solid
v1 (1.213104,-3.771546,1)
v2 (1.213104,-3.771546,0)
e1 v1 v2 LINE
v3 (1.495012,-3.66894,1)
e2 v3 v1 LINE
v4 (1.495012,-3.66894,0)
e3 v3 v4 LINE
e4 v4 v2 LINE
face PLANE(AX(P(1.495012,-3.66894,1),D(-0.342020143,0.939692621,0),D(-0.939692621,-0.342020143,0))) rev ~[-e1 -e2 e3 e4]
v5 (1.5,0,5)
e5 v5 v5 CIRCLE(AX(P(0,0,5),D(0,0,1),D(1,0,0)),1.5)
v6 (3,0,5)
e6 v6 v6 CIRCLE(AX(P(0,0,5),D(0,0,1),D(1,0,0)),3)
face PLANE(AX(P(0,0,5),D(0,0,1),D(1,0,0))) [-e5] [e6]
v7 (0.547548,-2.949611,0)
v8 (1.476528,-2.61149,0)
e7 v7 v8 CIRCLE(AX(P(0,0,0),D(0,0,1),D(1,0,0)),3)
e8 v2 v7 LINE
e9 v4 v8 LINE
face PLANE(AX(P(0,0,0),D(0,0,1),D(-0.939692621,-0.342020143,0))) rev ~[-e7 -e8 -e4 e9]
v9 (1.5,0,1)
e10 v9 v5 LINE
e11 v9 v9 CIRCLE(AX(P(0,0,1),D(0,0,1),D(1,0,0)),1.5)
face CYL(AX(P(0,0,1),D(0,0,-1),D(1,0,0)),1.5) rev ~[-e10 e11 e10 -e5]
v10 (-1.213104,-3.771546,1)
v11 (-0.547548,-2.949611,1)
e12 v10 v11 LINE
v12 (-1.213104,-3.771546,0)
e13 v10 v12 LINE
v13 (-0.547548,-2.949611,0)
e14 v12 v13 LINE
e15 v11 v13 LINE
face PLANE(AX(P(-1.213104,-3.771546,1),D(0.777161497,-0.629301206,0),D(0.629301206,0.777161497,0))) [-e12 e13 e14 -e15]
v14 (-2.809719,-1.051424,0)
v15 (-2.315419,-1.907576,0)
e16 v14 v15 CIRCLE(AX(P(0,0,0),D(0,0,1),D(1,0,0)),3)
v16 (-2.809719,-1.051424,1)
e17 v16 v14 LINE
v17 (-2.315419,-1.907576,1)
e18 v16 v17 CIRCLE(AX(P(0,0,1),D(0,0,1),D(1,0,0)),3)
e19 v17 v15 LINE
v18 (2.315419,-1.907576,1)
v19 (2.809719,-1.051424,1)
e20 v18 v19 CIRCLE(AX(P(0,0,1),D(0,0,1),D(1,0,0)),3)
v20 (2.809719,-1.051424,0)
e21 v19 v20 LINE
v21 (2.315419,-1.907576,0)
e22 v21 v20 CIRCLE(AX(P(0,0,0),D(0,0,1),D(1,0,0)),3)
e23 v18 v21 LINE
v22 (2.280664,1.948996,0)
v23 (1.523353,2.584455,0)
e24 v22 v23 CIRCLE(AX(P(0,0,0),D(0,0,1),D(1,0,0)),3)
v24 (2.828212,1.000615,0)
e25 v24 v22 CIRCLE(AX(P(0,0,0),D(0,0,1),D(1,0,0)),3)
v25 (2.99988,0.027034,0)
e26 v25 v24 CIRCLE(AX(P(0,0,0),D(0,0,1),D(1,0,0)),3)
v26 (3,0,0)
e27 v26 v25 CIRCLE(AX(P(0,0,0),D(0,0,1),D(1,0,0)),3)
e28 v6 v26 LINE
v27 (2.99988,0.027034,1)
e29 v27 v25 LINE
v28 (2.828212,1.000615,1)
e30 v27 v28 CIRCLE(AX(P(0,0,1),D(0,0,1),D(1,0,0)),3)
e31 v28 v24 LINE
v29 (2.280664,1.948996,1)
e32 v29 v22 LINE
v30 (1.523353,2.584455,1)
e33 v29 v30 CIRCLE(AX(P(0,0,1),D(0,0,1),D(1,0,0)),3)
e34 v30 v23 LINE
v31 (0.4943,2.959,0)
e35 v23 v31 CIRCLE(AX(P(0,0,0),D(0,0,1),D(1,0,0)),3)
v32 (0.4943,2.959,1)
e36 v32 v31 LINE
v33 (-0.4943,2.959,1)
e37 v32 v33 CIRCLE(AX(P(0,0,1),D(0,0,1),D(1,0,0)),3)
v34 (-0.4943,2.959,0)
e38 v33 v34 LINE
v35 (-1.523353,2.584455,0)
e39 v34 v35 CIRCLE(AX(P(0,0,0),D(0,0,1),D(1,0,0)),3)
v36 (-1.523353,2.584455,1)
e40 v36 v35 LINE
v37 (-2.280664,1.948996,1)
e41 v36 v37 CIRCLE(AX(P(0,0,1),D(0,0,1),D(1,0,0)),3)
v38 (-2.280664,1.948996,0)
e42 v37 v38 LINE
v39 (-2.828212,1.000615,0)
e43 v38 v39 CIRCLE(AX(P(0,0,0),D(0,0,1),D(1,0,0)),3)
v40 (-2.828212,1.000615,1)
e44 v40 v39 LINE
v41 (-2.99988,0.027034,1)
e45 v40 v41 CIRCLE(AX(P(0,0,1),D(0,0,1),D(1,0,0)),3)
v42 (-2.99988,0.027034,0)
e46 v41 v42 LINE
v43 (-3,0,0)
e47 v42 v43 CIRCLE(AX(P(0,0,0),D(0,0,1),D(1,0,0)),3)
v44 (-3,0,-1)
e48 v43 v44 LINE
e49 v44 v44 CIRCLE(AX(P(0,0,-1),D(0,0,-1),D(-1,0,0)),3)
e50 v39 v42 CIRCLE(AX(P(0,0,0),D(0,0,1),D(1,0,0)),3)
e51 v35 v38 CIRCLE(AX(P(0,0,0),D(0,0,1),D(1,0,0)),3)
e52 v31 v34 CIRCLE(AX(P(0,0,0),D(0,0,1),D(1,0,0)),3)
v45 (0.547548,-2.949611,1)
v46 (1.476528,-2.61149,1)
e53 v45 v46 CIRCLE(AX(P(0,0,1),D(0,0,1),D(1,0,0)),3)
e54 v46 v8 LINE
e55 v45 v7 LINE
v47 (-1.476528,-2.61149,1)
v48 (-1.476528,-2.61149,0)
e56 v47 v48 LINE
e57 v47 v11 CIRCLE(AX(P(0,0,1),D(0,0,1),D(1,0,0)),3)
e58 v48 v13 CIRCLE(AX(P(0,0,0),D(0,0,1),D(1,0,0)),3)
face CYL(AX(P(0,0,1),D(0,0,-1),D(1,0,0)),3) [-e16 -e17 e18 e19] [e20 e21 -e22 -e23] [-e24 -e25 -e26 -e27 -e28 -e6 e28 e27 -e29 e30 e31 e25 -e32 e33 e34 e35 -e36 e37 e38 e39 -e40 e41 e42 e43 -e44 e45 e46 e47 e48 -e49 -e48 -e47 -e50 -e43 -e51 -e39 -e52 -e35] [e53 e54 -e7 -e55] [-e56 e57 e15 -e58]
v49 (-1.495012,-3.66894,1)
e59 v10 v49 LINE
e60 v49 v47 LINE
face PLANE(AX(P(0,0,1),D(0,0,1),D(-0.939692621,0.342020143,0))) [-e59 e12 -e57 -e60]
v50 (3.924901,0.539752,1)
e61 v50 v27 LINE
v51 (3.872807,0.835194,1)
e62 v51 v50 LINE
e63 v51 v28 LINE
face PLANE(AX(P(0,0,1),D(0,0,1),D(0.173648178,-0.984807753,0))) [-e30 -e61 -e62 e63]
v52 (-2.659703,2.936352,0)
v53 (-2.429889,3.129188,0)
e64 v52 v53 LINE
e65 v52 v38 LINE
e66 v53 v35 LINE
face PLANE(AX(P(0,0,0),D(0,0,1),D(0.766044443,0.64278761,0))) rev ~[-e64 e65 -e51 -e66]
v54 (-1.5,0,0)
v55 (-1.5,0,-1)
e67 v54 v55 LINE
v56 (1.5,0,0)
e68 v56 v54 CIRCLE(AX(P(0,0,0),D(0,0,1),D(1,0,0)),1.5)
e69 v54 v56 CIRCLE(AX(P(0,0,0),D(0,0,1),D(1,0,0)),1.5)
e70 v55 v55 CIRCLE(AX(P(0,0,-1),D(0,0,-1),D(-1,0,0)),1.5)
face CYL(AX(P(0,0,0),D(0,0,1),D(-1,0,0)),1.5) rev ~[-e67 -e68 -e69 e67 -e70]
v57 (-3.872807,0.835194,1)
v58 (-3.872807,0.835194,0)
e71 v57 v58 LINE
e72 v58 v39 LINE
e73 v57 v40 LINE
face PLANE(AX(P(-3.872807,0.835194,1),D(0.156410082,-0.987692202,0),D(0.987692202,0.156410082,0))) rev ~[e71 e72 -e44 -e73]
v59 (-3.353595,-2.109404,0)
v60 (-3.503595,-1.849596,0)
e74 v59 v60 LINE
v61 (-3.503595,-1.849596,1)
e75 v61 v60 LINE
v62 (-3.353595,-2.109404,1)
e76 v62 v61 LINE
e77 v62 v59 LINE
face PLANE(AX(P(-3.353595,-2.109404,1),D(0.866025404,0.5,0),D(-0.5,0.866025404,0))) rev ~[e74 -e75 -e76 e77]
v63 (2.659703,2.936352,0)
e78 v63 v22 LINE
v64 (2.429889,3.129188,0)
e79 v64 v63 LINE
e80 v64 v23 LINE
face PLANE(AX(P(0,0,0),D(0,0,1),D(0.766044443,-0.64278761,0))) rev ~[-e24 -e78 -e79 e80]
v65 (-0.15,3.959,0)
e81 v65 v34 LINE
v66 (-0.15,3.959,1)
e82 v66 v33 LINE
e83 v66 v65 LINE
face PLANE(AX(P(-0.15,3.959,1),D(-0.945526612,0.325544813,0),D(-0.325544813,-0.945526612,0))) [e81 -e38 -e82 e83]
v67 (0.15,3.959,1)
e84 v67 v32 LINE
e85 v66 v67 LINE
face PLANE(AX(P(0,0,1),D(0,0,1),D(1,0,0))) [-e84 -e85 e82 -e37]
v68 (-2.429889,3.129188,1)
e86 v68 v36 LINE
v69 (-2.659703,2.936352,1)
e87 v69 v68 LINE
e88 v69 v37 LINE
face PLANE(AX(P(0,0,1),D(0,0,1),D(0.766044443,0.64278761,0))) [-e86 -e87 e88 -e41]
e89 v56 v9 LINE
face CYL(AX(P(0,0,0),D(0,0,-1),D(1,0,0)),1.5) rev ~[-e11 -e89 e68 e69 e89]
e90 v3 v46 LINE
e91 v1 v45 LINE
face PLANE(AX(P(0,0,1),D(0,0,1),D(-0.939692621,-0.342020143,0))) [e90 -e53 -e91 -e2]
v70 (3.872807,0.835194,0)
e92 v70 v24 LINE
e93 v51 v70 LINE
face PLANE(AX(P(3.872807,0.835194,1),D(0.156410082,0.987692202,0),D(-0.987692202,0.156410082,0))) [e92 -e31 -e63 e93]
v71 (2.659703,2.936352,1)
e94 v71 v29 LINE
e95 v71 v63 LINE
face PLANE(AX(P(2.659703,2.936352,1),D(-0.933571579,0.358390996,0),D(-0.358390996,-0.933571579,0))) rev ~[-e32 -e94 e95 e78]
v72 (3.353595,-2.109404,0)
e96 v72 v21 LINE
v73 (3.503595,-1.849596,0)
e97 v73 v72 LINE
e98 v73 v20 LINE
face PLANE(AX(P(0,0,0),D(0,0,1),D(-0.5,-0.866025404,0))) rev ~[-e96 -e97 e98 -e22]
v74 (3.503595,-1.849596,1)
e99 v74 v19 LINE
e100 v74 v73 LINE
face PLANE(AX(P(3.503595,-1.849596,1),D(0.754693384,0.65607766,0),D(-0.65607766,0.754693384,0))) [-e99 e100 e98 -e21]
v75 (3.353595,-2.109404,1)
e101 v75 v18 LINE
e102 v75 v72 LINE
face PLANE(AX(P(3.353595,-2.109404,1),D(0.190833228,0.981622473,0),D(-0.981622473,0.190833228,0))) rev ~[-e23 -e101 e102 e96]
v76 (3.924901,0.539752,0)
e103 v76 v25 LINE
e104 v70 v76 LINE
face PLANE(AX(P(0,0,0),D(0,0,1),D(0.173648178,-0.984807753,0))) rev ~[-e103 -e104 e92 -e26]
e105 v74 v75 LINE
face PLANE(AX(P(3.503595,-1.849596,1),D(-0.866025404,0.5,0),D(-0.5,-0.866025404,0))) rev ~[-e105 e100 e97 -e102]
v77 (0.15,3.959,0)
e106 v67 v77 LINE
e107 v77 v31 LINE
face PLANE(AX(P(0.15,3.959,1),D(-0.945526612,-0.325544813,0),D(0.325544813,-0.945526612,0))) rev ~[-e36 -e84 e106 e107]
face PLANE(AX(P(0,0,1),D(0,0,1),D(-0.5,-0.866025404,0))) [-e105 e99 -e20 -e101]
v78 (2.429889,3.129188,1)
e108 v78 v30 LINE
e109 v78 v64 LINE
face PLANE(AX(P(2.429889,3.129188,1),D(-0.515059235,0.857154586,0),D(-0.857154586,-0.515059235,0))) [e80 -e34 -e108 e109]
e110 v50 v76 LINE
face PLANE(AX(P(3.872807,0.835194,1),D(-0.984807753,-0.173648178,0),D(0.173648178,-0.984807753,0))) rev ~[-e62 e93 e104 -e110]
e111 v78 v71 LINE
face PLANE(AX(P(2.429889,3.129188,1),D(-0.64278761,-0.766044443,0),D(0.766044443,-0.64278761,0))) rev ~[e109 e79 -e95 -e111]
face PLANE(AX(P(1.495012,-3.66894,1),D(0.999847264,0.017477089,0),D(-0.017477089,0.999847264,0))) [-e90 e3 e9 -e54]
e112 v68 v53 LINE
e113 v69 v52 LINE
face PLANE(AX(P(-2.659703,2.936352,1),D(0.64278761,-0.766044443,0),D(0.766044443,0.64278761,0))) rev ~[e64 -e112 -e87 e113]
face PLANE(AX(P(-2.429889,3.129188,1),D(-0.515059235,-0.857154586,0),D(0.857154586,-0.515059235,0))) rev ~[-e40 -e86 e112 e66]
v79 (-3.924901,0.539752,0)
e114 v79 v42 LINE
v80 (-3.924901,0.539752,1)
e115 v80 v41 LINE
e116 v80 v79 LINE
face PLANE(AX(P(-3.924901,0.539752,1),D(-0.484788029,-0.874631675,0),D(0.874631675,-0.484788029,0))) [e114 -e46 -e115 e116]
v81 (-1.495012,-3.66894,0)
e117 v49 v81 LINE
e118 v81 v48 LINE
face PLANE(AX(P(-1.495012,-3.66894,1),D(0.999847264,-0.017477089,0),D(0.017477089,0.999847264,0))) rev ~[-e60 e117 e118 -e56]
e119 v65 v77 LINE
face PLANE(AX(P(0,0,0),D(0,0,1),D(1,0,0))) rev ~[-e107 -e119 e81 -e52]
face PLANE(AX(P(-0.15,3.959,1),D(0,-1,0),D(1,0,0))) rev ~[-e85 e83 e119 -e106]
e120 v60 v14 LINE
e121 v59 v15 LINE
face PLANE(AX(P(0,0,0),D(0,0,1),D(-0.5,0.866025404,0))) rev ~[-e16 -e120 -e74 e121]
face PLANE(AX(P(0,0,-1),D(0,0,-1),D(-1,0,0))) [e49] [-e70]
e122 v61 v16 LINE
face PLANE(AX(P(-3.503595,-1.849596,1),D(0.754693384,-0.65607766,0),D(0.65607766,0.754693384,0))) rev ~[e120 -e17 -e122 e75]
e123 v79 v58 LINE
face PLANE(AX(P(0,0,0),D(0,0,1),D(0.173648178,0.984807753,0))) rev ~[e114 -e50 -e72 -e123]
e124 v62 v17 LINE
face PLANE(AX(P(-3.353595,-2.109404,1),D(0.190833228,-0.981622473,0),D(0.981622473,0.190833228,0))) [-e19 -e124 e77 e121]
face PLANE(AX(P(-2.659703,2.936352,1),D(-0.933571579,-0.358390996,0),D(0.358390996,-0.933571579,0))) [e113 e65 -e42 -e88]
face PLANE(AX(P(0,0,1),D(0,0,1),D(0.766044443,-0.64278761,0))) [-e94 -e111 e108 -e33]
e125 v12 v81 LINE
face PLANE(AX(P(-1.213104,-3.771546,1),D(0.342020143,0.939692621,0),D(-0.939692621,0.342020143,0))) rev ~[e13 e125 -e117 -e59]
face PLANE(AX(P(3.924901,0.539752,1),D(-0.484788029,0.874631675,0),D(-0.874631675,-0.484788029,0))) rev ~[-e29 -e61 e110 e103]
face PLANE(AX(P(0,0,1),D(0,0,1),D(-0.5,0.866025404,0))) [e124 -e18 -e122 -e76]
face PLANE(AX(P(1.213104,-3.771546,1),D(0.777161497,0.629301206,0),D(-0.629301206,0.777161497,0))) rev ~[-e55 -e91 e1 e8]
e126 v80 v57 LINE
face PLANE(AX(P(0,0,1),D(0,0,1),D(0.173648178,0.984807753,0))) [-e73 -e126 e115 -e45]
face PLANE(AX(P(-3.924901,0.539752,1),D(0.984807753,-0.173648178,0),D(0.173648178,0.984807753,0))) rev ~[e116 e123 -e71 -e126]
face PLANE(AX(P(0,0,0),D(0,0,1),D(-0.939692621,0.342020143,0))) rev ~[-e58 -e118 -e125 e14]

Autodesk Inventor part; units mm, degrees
ref_plane "YZ Plane" through (0, 0, 0) normal (1, 0, 0) x (0, 1, 0)
ref_plane "XZ Plane" through (0, 0, 0) normal (0, 1, 0) x (-1, 0, 0)
ref_plane "XY Plane" through (0, 0, 0) normal (0, 0, 1) x (1, 0, 0)
sketch "Sketch1" plane through (0, 0, 0) normal (0, 0, 1) x (1, 0, 0)
  circle A0 centre (0, 0) radius 3
  circle A1 centre (0, 0) radius 1.5
  dimension "d0" = 6
  dimension "d1" = 3
extrude "Extrusion1" add sketch "Sketch1" along normal blind 1
sketch "Sketch3" plane through (0, 0, 0) normal (0, 0, -1) x (-1, 0, 0)
  circle A0 centre (0, 0) radius 1.5 projected
  circle A1 centre (0, 0) radius 3 projected
extrude "Extrusion3" add sketch "Sketch3" along normal blind 1
sketch "Sketch2" plane through (0, 0, 1) normal (0, 0, 1) x (1, 0, 0)
  line L0 (0, 0) -> (0, 3.959) construction
  line L1 (-0.15, 3.959) -> (0.15, 3.959)
  line L2 (-0.4943, 2.959) -> (0.4943, 2.959)
  line L3 (-0.15, 3.959) -> (-0.4943, 2.959)
  line L4 (0.15, 3.959) -> (0.4943, 2.959)
  circle A0 centre (0, 0) radius 3 projected
  point P0 (0, 2.959)
  dimension "d4" = 1
  dimension "d5" = 0.3
  dimension "d8" = 109
extrude "Extrusion2" add sketch "Sketch2" against normal up to surface (1 mm away) separate body contours L1 L4 A0 L3 | A0 L2 picked at (-0.0551, 2.9711)
sketch "Sketch4" plane through (0, 0, 1) normal (0, 0, 1) x (1, 0, 0)
  circle A0 centre (0, 0) radius 1.5 projected
  circle A1 centre (0, 0) radius 3 projected
extrude "Extrusion4" add sketch "Sketch4" along normal blind 4 bodies 1
pattern_circular "Circular Pattern1" count 9 over 360 about axis through (0, 0, 0) along (0, 0, 1) of "Extrusion2" bodies 2
combine bodies "Combine1" operation type add bodies to combine 1 2
properties part number "ChainGear"
